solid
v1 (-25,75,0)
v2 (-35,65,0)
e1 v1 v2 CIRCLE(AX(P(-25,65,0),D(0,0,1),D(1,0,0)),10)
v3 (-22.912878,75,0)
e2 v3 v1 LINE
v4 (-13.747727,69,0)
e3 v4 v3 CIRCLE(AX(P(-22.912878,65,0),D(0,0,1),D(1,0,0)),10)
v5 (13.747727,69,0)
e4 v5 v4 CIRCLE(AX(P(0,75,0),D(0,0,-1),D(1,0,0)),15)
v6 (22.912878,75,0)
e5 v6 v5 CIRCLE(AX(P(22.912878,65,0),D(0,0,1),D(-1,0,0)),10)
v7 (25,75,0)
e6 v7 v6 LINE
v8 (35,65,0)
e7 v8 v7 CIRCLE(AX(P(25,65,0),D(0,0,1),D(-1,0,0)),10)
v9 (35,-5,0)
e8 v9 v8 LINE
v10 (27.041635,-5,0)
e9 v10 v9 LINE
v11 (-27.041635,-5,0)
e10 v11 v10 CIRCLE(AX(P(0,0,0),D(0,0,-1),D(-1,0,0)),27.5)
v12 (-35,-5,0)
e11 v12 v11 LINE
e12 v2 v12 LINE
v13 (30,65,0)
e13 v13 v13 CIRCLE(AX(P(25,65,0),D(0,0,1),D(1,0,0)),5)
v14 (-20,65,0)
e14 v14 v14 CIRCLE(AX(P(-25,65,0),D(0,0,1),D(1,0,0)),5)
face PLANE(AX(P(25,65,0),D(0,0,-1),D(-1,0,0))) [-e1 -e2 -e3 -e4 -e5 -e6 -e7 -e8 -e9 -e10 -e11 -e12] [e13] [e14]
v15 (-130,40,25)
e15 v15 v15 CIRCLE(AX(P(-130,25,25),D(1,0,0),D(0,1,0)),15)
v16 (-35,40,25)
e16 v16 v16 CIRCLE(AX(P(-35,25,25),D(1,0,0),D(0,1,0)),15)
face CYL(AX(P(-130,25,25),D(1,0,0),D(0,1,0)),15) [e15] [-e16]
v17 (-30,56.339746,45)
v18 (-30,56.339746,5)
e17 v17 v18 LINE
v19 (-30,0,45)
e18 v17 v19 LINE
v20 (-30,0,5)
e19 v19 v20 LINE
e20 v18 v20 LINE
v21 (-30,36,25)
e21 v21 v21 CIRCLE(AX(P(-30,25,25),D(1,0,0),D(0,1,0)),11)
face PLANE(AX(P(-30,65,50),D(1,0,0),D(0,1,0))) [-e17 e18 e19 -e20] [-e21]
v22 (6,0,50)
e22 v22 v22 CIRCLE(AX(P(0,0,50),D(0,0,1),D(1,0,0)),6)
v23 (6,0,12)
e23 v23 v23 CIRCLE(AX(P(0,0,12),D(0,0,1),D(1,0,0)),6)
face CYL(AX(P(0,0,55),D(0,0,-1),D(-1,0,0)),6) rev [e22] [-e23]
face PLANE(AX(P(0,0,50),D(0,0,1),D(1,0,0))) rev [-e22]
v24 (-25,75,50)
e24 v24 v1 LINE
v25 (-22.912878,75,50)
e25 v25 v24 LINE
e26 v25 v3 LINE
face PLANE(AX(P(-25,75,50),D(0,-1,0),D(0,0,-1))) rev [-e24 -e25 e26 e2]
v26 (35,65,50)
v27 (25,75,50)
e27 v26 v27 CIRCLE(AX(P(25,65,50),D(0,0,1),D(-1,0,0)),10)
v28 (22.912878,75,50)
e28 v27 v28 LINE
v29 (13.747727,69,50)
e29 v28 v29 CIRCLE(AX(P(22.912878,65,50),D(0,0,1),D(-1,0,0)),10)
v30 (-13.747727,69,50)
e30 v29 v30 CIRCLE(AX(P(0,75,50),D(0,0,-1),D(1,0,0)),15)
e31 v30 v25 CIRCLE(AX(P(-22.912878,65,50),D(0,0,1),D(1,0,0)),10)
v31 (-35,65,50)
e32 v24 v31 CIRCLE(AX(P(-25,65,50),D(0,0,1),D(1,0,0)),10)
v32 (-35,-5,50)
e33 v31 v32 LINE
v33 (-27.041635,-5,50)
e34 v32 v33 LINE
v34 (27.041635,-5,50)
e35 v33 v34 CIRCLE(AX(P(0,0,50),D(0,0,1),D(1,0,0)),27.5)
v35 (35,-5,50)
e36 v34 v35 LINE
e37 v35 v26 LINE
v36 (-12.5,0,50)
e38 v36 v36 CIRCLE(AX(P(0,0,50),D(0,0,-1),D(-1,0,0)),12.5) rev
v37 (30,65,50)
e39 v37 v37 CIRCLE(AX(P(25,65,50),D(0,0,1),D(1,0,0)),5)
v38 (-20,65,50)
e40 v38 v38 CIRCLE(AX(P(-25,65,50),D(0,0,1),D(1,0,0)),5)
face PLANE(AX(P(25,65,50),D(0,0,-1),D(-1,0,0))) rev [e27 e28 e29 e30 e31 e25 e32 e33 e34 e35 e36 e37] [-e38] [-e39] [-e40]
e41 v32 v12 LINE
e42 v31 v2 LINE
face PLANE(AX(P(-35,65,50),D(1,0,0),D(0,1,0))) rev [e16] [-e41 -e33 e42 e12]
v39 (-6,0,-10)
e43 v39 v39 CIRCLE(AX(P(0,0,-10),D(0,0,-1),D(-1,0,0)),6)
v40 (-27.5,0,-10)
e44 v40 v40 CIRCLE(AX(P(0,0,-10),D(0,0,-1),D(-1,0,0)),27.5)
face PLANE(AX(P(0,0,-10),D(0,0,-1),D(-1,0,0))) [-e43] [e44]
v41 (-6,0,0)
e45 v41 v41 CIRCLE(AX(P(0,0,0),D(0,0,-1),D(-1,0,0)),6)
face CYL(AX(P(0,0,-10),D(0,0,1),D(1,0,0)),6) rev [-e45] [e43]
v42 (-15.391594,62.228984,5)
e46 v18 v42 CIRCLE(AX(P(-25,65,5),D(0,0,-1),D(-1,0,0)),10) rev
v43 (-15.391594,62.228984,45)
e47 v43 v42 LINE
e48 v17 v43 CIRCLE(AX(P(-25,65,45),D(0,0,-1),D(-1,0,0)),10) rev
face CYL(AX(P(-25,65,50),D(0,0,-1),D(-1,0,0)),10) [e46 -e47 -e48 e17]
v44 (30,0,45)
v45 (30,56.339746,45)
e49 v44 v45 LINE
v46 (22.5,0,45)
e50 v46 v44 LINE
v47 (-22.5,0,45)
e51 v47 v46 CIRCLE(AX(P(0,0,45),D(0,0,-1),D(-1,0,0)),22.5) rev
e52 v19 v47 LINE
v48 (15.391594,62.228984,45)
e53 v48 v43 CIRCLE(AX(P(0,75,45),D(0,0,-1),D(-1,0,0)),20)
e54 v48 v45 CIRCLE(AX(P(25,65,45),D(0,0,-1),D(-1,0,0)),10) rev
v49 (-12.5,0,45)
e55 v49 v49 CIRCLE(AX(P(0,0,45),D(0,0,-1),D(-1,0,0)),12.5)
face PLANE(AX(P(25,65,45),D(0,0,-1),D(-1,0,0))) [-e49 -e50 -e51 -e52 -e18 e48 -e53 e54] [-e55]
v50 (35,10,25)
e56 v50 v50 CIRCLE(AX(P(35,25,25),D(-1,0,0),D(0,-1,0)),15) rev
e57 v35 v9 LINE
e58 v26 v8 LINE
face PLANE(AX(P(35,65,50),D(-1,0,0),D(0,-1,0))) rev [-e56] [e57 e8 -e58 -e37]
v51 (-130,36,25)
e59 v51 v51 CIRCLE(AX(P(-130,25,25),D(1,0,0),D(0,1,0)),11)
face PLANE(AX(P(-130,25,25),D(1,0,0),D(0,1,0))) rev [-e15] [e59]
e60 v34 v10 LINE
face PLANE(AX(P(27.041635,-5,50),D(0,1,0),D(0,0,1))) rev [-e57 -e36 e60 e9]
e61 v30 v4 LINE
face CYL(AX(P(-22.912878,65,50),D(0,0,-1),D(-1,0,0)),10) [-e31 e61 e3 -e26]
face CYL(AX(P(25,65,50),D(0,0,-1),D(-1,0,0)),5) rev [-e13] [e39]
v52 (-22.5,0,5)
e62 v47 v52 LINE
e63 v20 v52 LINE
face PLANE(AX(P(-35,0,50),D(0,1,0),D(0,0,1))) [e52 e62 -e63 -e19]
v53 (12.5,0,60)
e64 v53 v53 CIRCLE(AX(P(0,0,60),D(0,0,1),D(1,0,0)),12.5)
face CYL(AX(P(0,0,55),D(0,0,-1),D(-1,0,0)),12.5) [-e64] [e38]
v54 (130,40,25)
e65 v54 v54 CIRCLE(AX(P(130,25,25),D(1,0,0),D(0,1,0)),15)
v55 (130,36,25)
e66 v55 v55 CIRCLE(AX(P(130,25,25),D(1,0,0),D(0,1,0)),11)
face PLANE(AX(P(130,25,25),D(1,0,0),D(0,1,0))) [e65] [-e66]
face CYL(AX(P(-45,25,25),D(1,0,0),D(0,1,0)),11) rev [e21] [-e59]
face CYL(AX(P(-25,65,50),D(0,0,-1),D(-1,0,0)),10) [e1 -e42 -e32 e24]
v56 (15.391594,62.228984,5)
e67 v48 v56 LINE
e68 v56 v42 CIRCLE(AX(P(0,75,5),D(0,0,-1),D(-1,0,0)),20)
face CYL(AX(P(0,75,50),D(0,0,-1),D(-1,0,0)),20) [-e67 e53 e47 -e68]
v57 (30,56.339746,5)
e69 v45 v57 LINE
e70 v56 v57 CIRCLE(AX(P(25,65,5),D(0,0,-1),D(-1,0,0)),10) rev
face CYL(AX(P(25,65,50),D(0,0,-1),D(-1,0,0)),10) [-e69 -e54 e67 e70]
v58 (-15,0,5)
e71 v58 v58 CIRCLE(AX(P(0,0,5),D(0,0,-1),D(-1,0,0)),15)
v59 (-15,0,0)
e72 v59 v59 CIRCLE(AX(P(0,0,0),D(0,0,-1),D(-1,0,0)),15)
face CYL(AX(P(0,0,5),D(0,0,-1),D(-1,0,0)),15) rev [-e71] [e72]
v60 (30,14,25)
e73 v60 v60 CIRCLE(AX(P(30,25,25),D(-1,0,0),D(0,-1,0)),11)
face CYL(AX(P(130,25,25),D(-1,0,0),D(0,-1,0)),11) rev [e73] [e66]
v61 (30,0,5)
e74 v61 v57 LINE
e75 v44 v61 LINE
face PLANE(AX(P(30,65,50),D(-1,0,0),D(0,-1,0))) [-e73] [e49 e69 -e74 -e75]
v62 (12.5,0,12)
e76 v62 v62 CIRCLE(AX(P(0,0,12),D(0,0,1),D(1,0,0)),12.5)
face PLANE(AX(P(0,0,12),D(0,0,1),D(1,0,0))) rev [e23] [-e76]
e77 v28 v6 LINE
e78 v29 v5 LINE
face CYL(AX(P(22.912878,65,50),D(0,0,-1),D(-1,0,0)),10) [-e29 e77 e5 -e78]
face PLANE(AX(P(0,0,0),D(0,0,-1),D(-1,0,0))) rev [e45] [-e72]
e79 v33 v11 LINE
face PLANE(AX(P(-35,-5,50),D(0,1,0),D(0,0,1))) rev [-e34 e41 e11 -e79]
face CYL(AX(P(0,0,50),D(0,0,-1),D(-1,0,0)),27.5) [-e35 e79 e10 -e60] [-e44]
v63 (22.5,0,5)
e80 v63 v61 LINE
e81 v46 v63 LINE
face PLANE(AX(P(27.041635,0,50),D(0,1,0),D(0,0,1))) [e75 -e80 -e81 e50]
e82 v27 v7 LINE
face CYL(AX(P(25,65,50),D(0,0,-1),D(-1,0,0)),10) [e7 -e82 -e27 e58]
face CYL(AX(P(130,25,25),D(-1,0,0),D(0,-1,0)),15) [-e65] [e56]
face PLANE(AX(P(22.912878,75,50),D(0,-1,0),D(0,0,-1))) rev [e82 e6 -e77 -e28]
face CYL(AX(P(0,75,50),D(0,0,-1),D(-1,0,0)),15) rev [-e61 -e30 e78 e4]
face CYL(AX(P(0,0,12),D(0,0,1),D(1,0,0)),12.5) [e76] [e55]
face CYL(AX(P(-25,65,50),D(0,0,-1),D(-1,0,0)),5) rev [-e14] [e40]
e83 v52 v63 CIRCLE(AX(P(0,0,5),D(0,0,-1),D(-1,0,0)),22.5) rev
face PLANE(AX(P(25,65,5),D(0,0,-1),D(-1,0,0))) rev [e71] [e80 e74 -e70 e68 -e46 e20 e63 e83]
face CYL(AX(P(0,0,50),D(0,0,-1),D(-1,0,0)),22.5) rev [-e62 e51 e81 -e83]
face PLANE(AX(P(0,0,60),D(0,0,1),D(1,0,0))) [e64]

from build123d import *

# Parameters (mm, degrees)
SKETCH1_R           = 5
BOSS_EXTRUDE2_DEPTH = 50
SHELL2_START        = 5
SHELL2_DEPTH        = 40
SKETCH3_R           = 15
CUT_EXTRUDE1_DEPTH  = 5
BOSS_EXTRUDE3_START = 10
SKETCH4_R           = 27.5
SKETCH4_R_2         = 6
BOSS_EXTRUDE3_DEPTH = 10
SKETCH5_R           = 15
SKETCH5_R_2         = 11
BOSS_EXTRUDE4_DEPTH = 95
CUT_EXTRUDE2_START  = -80
SKETCH5_2_R         = 11
CUT_EXTRUDE2_DEPTH  = 80
BOSS_EXTRUDE5_START = -165
SKETCH5_3_R         = 15
SKETCH5_3_R_2       = 11
BOSS_EXTRUDE5_DEPTH = 95
SKETCH6_R           = 12.5
SKETCH6_R_2         = 6
BOSS_EXTRUDE6_DEPTH = 5
CUT_EXTRUDE3_START  = -5
SKETCH6_2_R         = 6
CUT_EXTRUDE3_DEPTH  = 5
BOSS_EXTRUDE7_START = -38
SKETCH6_3_R         = 12.5
SKETCH6_3_R_2       = 6
BOSS_EXTRUDE7_DEPTH = 38
SKETCH6_4_R         = 12.5
SKETCH6_4_R_2       = 6
BOSS_EXTRUDE8_DEPTH = 10


# Read off the part's stored shape, not the designer's step: Shell2
with BuildPart() as part:
    # Sketch1 → Boss-Extrude2 (new body)
    with BuildSketch(Plane.XY):
        with BuildLine():
            Line((22.912878475, 75), (25, 75))
            ThreePointArc((25, 75), (32.071067812, 72.071067812), (35, 65))
            Line((35, 65), (35, -5))
            Line((35, -5), (27.041634566, -5))
            ThreePointArc((27.041634566, -5), (0, -27.5), (-27.041634566, -5))
            Line((-27.041634566, -5), (-35, -5))
            Line((-35, -5), (-35, 65))
            ThreePointArc((-35, 65), (-32.071067812, 72.071067812), (-25, 75))
            Line((-25, 75), (-22.912878475, 75))
            ThreePointArc((-22.912878475, 75), (-17.4356529, 73.366600265), (-13.747727085, 69))
            ThreePointArc((-13.747727085, 69), (0, 60), (13.747727085, 69))
            ThreePointArc((13.747727085, 69), (17.4356529, 73.366600265), (22.912878475, 75))
        make_face()
        with Locations((-25, 65)):
            Circle(SKETCH1_R, mode=Mode.SUBTRACT)
        with Locations((25, 65)):
            Circle(SKETCH1_R, mode=Mode.SUBTRACT)
    extrude(amount=BOSS_EXTRUDE2_DEPTH)

    # Shell2 outline → Shell2 (cut)
    with BuildSketch(Plane.XY.offset(SHELL2_START)):
        with BuildLine():
            Line((30, 0), (30, 56.339745962))
            ThreePointArc((30, 56.339745962), (21.260998255, 55.725310466), (15.391593697, 62.228984243))
            ThreePointArc((15.391593697, 62.228984243), (0, 55), (-15.391593697, 62.228984243))
            ThreePointArc((-15.391593697, 62.228984243), (-21.260998255, 55.725310466), (-30, 56.339745962))
            Line((-30, 56.339745962), (-30, 0))
            Line((-30, 0), (-22.5, 0))
            ThreePointArc((-22.5, 0), (0, -22.5), (22.5, 0))
            Line((22.5, 0), (30, 0))
        make_face()
    extrude(amount=SHELL2_DEPTH, mode=Mode.SUBTRACT)

    # Sketch3 → Cut-Extrude1 (cut)
    with BuildSketch(Plane(origin=(0, 0, 0), x_dir=(-1, 0, 0), z_dir=(0, 0, -1))):
        Circle(SKETCH3_R)
    extrude(amount=-CUT_EXTRUDE1_DEPTH, mode=Mode.SUBTRACT)

    # Sketch4 → Boss-Extrude3 (add)
    with BuildSketch(Plane(origin=(0, 0, 0), x_dir=(-1, 0, 0), z_dir=(0, 0, -1)).offset(BOSS_EXTRUDE3_START)):
        Circle(SKETCH4_R)
        Circle(SKETCH4_R_2, mode=Mode.SUBTRACT)
    extrude(amount=-BOSS_EXTRUDE3_DEPTH)

    # Sketch5 → Boss-Extrude4 (add)
    with BuildSketch(Plane(origin=(35, 0, 0), x_dir=(0, 0, -1), z_dir=(1, 0, 0))):
        with Locations(Location((-25, 25, 0), (0, 0, 270))):
            Circle(SKETCH5_R)
        with Locations(Location((-25, 25, 0), (0, 0, 90))):
            Circle(SKETCH5_R_2, mode=Mode.SUBTRACT)
    extrude(amount=BOSS_EXTRUDE4_DEPTH)

    # Sketch5<2> → Cut-Extrude2 (cut)
    with BuildSketch(Plane(origin=(35, 0, 0), x_dir=(0, 0, -1), z_dir=(1, 0, 0)).offset(CUT_EXTRUDE2_START)):
        with Locations(Location((-25, 25, 0), (0, 0, 270))):
            Circle(SKETCH5_2_R)
    extrude(amount=CUT_EXTRUDE2_DEPTH, mode=Mode.SUBTRACT)

    # Sketch5<3> → Boss-Extrude5 (add)
    with BuildSketch(Plane(origin=(35, 0, 0), x_dir=(0, 0, -1), z_dir=(1, 0, 0)).offset(BOSS_EXTRUDE5_START)):
        with Locations(Location((-25, 25, 0), (0, 0, 270))):
            Circle(SKETCH5_3_R)
        with Locations(Location((-25, 25, 0), (0, 0, 270))):
            Circle(SKETCH5_3_R_2, mode=Mode.SUBTRACT)
    extrude(amount=BOSS_EXTRUDE5_DEPTH)

    # Sketch6 → Boss-Extrude6 (add)
    with BuildSketch(Plane.XY.offset(50)):
        with Locations(Location((0, 0, 0), (0, 0, 180))):
            Circle(SKETCH6_R)
        with Locations(Location((0, 0, 0), (0, 0, 180))):
            Circle(SKETCH6_R_2, mode=Mode.SUBTRACT)
    extrude(amount=BOSS_EXTRUDE6_DEPTH)

    # Sketch6<2> → Cut-Extrude3 (cut)
    with BuildSketch(Plane.XY.offset(50).offset(CUT_EXTRUDE3_START)):
        with Locations(Location((0, 0, 0), (0, 0, 180))):
            Circle(SKETCH6_2_R)
    extrude(amount=CUT_EXTRUDE3_DEPTH, mode=Mode.SUBTRACT)

    # Sketch6<3> → Boss-Extrude7 (add)
    with BuildSketch(Plane.XY.offset(50).offset(BOSS_EXTRUDE7_START)):
        with Locations(Location((0, 0, 0), (0, 0, 180))):
            Circle(SKETCH6_3_R)
        with Locations(Location((0, 0, 0), (0, 0, 180))):
            Circle(SKETCH6_3_R_2, mode=Mode.SUBTRACT)
    extrude(amount=BOSS_EXTRUDE7_DEPTH)

    # Sketch6<4> → Boss-Extrude8 (add)
    # profile 1 of 2: a face of its own
    with BuildSketch(Plane.XY.offset(50)):
        with Locations(Location((0, 0, 0), (0, 0, 180))):
            Circle(SKETCH6_4_R)
        Circle(SKETCH6_4_R_2, mode=Mode.SUBTRACT)
    # profile 2 of 2: a face of its own
    with BuildSketch(Plane.XY.offset(50)):
        Circle(SKETCH6_4_R_2)
    extrude(amount=BOSS_EXTRUDE8_DEPTH)


solid = part.part
